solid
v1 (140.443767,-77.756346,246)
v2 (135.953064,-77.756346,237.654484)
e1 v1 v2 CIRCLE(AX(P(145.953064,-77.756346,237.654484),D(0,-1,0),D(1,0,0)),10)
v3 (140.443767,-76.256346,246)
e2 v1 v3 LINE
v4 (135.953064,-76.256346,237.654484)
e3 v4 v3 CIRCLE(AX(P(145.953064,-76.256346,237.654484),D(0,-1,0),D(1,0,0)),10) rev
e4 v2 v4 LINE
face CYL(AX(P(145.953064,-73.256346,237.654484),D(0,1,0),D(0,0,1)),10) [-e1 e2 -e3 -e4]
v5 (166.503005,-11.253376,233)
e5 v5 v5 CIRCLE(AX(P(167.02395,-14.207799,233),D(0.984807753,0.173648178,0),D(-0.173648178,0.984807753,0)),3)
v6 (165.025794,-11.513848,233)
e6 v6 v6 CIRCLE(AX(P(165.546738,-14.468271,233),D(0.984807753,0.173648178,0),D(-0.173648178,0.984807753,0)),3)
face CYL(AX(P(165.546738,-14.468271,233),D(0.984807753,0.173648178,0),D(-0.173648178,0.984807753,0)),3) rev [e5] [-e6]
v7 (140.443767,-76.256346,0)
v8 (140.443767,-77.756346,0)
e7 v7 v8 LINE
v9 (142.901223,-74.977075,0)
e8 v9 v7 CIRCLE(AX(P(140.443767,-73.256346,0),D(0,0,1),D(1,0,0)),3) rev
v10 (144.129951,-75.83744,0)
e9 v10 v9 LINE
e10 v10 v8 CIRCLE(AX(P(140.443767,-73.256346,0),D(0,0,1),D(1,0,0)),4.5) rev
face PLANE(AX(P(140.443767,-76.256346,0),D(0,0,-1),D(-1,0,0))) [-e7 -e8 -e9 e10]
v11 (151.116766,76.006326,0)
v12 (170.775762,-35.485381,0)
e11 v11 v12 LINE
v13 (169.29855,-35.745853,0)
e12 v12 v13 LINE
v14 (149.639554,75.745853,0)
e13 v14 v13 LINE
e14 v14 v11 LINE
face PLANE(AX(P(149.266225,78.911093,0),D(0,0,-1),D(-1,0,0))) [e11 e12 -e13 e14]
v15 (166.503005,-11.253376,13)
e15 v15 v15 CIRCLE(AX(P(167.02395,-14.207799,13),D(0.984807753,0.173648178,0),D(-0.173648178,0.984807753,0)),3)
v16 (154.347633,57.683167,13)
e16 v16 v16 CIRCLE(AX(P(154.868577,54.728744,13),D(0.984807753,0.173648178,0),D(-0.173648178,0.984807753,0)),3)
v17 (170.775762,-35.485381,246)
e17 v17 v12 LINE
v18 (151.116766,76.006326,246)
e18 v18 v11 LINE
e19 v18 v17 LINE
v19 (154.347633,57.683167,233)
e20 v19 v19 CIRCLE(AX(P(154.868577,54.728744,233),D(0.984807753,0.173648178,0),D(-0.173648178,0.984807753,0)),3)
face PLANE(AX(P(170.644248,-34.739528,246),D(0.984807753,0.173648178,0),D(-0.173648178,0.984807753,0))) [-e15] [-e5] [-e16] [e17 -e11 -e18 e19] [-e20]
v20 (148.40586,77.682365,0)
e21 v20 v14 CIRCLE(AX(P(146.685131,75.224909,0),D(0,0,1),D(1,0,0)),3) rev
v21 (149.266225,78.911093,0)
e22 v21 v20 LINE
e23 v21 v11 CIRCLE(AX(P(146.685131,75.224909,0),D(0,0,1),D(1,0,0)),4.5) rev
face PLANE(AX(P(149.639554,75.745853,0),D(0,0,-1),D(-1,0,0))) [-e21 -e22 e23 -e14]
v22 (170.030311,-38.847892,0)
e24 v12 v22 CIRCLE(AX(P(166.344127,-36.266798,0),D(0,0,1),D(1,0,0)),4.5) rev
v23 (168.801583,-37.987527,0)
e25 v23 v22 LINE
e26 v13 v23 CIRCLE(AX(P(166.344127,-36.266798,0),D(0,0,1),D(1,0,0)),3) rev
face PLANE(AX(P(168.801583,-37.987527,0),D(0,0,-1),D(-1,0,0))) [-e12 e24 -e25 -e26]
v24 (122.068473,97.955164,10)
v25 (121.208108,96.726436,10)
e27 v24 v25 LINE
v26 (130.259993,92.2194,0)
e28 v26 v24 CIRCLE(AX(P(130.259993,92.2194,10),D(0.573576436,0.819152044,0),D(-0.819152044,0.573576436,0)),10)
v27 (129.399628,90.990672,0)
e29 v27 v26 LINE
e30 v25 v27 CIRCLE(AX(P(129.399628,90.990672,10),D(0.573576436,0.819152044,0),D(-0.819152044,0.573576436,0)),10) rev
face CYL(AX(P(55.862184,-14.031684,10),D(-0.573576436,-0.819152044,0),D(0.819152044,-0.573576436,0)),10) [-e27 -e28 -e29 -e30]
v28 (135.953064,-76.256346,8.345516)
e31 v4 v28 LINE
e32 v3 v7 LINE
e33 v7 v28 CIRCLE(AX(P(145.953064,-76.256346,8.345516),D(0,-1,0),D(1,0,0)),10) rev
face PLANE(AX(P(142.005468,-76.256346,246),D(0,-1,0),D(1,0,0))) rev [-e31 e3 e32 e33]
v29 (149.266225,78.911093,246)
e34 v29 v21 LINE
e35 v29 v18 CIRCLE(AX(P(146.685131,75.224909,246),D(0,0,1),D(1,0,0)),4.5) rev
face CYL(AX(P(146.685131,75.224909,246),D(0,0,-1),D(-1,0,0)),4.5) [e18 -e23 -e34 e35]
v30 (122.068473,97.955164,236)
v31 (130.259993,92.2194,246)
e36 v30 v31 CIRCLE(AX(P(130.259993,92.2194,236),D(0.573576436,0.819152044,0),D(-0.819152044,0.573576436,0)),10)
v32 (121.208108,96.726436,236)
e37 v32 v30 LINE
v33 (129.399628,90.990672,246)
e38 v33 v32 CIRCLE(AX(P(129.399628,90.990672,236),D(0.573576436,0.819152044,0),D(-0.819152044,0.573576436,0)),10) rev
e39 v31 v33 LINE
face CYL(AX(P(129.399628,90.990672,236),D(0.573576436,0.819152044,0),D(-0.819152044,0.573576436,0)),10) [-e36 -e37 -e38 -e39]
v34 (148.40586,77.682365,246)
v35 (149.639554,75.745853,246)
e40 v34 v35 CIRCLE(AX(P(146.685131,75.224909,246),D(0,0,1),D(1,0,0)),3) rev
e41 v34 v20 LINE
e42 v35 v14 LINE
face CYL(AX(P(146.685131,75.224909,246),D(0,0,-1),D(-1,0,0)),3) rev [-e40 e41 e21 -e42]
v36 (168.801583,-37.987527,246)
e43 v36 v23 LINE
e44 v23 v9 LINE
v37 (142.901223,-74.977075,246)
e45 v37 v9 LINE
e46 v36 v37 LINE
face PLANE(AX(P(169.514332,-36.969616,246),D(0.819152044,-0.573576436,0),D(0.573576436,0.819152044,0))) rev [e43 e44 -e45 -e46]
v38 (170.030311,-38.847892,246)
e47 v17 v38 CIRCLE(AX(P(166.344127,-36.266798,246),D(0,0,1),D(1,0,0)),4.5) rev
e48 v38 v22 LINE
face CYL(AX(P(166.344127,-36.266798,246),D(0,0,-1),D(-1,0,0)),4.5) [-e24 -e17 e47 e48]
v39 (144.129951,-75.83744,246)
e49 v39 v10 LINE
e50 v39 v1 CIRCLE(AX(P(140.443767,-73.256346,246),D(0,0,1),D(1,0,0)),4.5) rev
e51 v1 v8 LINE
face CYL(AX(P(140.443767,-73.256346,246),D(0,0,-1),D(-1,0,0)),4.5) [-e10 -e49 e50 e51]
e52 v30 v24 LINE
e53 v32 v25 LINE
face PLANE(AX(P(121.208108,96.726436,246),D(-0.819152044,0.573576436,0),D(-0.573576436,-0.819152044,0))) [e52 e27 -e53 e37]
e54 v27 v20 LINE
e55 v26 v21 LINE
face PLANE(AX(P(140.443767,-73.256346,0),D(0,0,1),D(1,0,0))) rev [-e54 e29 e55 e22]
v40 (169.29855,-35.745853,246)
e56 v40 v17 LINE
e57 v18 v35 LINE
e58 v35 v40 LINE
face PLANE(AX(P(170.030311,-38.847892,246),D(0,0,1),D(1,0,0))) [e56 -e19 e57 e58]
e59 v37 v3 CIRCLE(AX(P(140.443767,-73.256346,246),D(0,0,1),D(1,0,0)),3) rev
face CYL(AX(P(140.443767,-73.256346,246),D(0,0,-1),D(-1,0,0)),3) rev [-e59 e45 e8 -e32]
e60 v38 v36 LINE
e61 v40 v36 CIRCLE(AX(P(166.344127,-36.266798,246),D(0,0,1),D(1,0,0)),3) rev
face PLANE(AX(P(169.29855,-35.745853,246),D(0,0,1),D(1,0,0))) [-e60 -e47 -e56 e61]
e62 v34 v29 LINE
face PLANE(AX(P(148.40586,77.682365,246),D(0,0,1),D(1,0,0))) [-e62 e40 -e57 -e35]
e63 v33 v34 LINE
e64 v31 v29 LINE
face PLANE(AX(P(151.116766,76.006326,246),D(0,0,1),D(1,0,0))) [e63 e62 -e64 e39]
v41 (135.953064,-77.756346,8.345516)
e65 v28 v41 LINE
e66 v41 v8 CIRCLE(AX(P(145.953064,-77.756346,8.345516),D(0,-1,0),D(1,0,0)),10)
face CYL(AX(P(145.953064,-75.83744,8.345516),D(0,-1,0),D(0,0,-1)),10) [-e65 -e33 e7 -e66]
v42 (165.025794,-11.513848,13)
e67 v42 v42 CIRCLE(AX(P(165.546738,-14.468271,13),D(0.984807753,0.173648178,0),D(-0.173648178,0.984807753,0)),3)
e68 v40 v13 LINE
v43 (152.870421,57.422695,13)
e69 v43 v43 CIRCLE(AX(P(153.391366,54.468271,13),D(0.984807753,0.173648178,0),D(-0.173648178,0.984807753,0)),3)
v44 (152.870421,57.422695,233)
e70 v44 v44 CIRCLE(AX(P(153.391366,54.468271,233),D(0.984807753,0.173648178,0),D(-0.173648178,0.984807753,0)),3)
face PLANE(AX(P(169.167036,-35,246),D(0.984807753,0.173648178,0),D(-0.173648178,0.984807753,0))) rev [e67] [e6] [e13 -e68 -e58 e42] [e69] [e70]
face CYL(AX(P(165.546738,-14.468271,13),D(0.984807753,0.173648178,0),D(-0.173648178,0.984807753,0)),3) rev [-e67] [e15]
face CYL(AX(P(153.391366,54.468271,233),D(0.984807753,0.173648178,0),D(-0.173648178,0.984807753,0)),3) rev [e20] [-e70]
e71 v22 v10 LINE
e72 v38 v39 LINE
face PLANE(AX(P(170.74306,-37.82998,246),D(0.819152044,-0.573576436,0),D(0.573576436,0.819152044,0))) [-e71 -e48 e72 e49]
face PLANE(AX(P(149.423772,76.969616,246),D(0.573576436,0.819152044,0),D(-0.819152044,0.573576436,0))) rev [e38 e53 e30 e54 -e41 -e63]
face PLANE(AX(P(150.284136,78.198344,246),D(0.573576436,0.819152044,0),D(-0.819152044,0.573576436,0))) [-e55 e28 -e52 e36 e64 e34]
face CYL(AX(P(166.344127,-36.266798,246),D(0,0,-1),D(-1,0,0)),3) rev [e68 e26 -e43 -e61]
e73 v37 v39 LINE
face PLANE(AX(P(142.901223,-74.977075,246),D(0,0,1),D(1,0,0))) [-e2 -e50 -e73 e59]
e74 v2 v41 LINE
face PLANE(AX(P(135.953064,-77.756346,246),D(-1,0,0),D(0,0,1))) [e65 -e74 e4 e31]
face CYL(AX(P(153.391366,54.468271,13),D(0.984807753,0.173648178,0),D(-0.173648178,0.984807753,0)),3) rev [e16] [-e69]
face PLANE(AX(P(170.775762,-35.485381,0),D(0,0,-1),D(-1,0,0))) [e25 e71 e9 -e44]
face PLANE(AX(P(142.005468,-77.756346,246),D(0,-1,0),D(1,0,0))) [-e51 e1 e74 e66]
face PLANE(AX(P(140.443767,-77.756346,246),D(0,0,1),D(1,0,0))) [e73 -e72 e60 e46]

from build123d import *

# Parameters (mm, degrees)
BASE_FLANGE1_DEPTH = 246
FILLET1_START      = -79
FILLET1_DEPTH      = 4
FILLET1_START_2    = 148
FILLET1_2_DEPTH    = 3
SKETCH6_R          = 3
CUT_EXTRUDE1_DEPTH = 1.5


with BuildPart() as part:
    # Base-Flange1: sheet metal written as solids
    # Sketch1 → Base-Flange1 (new body)
    with BuildSketch(Plane.XY):
        with BuildLine():
            Line((135.953063945, -76.256345678), (140.443766564, -76.256345678))
            ThreePointArc((140.443766564, -76.256345678), (141.829012404, -75.917378177), (142.901222697, -74.977074987))
            Line((142.901222697, -74.977074987), (168.801582917, -37.987527165))
            ThreePointArc((168.801582917, -37.987527165), (169.273014805, -36.916116698), (169.298550043, -35.745853323))
            Line((169.298550043, -35.745853323), (169.167035978, -35))
            Line((169.167035978, -35), (149.639554036, 75.745853323))
            ThreePointArc((149.639554036, 75.745853323), (149.215305114, 76.836807615), (148.405860086, 77.682364923))
            Line((148.405860086, 77.682364923), (121.208107966, 96.72643598))
            Line((121.208107966, 96.72643598), (122.06847262, 97.955164046))
            Line((122.06847262, 97.955164046), (149.266224741, 78.911092989))
            ThreePointArc((149.266224741, 78.911092989), (150.480392283, 77.642757028), (151.116765666, 76.00632559))
            Line((151.116765666, 76.00632559), (170.644247608, -34.739527733))
            Line((170.644247608, -34.739527733), (170.775761672, -35.485381057))
            ThreePointArc((170.775761672, -35.485381057), (170.737458816, -37.240776119), (170.030310983, -38.84789182))
            Line((170.030310983, -38.84789182), (144.129950763, -75.837439642))
            ThreePointArc((144.129950763, -75.837439642), (142.521635324, -77.247894427), (140.443766564, -77.756345678))
            Line((140.443766564, -77.756345678), (135.953063945, -77.756345678))
            Line((135.953063945, -77.756345678), (135.953063945, -76.256345678))
        make_face()
    extrude(amount=BASE_FLANGE1_DEPTH)

    # Fillet1: read off the stored shape, not the designer's step
    # Fillet1 outline → Fillet1 (cut)
    with BuildSketch(Plane(origin=(0, 0, 0), x_dir=(1, 0, 0), z_dir=(0, 1, 0)).offset(FILLET1_START)):
        with BuildLine():
            Line((135.953063945, 0), (135.953063945, -8.345516304))
            ThreePointArc((135.953063945, -8.345516304), (137.147015631, -3.607002497), (140.443766564, 0))
            Line((140.443766564, 0), (135.953063945, 0))
        make_face()
        with BuildLine():
            ThreePointArc((140.443766564, -246), (137.147015631, -242.392997503), (135.953063945, -237.654483696))
            Line((135.953063945, -237.654483696), (135.953063945, -246))
            Line((135.953063945, -246), (140.443766564, -246))
        make_face()
    extrude(amount=FILLET1_DEPTH, mode=Mode.SUBTRACT)

    # Fillet1 2 outline → Fillet1 2 (cut)
    with BuildSketch(Plane(origin=(0, 0, 0), x_dir=(0.819152044288989, -0.5735764363510502, 0), z_dir=(0.57357643635105, 0.819152044288989, 0)).offset(FILLET1_START_2)):
        with BuildLine():
            Line((43.807864974, 0), (43.807864974, -10))
            ThreePointArc((43.807864974, -10), (46.736797162, -2.928932188), (53.807864974, 0))
            Line((53.807864974, 0), (43.807864974, 0))
        make_face()
        with BuildLine():
            ThreePointArc((53.807864974, -246), (46.736797162, -243.071067812), (43.807864974, -236))
            Line((43.807864974, -236), (43.807864974, -246))
            Line((43.807864974, -246), (53.807864974, -246))
        make_face()
    extrude(amount=FILLET1_2_DEPTH, mode=Mode.SUBTRACT)

    # Sketch6 → Cut-Extrude1 (cut)
    with BuildSketch(Plane(origin=(159.557884805, 28.134360076, 0), x_dir=(0, 0, -1), z_dir=(0.984807753012208, 0.17364817766693147, 0))):
        with Locations(Location((-233, 27.004644779, 0), (0, 0, 90))):
            Circle(SKETCH6_R)
        with Locations(Location((-233, -42.995355221, 0), (0, 0, 90))):
            Circle(SKETCH6_R)
        with Locations(Location((-13, -42.995355221, 0), (0, 0, 90))):
            Circle(SKETCH6_R)
        with Locations(Location((-13, 27.004644779, 0), (0, 0, 90))):
            Circle(SKETCH6_R)
    extrude(amount=-CUT_EXTRUDE1_DEPTH, mode=Mode.SUBTRACT)


solid = part.part
